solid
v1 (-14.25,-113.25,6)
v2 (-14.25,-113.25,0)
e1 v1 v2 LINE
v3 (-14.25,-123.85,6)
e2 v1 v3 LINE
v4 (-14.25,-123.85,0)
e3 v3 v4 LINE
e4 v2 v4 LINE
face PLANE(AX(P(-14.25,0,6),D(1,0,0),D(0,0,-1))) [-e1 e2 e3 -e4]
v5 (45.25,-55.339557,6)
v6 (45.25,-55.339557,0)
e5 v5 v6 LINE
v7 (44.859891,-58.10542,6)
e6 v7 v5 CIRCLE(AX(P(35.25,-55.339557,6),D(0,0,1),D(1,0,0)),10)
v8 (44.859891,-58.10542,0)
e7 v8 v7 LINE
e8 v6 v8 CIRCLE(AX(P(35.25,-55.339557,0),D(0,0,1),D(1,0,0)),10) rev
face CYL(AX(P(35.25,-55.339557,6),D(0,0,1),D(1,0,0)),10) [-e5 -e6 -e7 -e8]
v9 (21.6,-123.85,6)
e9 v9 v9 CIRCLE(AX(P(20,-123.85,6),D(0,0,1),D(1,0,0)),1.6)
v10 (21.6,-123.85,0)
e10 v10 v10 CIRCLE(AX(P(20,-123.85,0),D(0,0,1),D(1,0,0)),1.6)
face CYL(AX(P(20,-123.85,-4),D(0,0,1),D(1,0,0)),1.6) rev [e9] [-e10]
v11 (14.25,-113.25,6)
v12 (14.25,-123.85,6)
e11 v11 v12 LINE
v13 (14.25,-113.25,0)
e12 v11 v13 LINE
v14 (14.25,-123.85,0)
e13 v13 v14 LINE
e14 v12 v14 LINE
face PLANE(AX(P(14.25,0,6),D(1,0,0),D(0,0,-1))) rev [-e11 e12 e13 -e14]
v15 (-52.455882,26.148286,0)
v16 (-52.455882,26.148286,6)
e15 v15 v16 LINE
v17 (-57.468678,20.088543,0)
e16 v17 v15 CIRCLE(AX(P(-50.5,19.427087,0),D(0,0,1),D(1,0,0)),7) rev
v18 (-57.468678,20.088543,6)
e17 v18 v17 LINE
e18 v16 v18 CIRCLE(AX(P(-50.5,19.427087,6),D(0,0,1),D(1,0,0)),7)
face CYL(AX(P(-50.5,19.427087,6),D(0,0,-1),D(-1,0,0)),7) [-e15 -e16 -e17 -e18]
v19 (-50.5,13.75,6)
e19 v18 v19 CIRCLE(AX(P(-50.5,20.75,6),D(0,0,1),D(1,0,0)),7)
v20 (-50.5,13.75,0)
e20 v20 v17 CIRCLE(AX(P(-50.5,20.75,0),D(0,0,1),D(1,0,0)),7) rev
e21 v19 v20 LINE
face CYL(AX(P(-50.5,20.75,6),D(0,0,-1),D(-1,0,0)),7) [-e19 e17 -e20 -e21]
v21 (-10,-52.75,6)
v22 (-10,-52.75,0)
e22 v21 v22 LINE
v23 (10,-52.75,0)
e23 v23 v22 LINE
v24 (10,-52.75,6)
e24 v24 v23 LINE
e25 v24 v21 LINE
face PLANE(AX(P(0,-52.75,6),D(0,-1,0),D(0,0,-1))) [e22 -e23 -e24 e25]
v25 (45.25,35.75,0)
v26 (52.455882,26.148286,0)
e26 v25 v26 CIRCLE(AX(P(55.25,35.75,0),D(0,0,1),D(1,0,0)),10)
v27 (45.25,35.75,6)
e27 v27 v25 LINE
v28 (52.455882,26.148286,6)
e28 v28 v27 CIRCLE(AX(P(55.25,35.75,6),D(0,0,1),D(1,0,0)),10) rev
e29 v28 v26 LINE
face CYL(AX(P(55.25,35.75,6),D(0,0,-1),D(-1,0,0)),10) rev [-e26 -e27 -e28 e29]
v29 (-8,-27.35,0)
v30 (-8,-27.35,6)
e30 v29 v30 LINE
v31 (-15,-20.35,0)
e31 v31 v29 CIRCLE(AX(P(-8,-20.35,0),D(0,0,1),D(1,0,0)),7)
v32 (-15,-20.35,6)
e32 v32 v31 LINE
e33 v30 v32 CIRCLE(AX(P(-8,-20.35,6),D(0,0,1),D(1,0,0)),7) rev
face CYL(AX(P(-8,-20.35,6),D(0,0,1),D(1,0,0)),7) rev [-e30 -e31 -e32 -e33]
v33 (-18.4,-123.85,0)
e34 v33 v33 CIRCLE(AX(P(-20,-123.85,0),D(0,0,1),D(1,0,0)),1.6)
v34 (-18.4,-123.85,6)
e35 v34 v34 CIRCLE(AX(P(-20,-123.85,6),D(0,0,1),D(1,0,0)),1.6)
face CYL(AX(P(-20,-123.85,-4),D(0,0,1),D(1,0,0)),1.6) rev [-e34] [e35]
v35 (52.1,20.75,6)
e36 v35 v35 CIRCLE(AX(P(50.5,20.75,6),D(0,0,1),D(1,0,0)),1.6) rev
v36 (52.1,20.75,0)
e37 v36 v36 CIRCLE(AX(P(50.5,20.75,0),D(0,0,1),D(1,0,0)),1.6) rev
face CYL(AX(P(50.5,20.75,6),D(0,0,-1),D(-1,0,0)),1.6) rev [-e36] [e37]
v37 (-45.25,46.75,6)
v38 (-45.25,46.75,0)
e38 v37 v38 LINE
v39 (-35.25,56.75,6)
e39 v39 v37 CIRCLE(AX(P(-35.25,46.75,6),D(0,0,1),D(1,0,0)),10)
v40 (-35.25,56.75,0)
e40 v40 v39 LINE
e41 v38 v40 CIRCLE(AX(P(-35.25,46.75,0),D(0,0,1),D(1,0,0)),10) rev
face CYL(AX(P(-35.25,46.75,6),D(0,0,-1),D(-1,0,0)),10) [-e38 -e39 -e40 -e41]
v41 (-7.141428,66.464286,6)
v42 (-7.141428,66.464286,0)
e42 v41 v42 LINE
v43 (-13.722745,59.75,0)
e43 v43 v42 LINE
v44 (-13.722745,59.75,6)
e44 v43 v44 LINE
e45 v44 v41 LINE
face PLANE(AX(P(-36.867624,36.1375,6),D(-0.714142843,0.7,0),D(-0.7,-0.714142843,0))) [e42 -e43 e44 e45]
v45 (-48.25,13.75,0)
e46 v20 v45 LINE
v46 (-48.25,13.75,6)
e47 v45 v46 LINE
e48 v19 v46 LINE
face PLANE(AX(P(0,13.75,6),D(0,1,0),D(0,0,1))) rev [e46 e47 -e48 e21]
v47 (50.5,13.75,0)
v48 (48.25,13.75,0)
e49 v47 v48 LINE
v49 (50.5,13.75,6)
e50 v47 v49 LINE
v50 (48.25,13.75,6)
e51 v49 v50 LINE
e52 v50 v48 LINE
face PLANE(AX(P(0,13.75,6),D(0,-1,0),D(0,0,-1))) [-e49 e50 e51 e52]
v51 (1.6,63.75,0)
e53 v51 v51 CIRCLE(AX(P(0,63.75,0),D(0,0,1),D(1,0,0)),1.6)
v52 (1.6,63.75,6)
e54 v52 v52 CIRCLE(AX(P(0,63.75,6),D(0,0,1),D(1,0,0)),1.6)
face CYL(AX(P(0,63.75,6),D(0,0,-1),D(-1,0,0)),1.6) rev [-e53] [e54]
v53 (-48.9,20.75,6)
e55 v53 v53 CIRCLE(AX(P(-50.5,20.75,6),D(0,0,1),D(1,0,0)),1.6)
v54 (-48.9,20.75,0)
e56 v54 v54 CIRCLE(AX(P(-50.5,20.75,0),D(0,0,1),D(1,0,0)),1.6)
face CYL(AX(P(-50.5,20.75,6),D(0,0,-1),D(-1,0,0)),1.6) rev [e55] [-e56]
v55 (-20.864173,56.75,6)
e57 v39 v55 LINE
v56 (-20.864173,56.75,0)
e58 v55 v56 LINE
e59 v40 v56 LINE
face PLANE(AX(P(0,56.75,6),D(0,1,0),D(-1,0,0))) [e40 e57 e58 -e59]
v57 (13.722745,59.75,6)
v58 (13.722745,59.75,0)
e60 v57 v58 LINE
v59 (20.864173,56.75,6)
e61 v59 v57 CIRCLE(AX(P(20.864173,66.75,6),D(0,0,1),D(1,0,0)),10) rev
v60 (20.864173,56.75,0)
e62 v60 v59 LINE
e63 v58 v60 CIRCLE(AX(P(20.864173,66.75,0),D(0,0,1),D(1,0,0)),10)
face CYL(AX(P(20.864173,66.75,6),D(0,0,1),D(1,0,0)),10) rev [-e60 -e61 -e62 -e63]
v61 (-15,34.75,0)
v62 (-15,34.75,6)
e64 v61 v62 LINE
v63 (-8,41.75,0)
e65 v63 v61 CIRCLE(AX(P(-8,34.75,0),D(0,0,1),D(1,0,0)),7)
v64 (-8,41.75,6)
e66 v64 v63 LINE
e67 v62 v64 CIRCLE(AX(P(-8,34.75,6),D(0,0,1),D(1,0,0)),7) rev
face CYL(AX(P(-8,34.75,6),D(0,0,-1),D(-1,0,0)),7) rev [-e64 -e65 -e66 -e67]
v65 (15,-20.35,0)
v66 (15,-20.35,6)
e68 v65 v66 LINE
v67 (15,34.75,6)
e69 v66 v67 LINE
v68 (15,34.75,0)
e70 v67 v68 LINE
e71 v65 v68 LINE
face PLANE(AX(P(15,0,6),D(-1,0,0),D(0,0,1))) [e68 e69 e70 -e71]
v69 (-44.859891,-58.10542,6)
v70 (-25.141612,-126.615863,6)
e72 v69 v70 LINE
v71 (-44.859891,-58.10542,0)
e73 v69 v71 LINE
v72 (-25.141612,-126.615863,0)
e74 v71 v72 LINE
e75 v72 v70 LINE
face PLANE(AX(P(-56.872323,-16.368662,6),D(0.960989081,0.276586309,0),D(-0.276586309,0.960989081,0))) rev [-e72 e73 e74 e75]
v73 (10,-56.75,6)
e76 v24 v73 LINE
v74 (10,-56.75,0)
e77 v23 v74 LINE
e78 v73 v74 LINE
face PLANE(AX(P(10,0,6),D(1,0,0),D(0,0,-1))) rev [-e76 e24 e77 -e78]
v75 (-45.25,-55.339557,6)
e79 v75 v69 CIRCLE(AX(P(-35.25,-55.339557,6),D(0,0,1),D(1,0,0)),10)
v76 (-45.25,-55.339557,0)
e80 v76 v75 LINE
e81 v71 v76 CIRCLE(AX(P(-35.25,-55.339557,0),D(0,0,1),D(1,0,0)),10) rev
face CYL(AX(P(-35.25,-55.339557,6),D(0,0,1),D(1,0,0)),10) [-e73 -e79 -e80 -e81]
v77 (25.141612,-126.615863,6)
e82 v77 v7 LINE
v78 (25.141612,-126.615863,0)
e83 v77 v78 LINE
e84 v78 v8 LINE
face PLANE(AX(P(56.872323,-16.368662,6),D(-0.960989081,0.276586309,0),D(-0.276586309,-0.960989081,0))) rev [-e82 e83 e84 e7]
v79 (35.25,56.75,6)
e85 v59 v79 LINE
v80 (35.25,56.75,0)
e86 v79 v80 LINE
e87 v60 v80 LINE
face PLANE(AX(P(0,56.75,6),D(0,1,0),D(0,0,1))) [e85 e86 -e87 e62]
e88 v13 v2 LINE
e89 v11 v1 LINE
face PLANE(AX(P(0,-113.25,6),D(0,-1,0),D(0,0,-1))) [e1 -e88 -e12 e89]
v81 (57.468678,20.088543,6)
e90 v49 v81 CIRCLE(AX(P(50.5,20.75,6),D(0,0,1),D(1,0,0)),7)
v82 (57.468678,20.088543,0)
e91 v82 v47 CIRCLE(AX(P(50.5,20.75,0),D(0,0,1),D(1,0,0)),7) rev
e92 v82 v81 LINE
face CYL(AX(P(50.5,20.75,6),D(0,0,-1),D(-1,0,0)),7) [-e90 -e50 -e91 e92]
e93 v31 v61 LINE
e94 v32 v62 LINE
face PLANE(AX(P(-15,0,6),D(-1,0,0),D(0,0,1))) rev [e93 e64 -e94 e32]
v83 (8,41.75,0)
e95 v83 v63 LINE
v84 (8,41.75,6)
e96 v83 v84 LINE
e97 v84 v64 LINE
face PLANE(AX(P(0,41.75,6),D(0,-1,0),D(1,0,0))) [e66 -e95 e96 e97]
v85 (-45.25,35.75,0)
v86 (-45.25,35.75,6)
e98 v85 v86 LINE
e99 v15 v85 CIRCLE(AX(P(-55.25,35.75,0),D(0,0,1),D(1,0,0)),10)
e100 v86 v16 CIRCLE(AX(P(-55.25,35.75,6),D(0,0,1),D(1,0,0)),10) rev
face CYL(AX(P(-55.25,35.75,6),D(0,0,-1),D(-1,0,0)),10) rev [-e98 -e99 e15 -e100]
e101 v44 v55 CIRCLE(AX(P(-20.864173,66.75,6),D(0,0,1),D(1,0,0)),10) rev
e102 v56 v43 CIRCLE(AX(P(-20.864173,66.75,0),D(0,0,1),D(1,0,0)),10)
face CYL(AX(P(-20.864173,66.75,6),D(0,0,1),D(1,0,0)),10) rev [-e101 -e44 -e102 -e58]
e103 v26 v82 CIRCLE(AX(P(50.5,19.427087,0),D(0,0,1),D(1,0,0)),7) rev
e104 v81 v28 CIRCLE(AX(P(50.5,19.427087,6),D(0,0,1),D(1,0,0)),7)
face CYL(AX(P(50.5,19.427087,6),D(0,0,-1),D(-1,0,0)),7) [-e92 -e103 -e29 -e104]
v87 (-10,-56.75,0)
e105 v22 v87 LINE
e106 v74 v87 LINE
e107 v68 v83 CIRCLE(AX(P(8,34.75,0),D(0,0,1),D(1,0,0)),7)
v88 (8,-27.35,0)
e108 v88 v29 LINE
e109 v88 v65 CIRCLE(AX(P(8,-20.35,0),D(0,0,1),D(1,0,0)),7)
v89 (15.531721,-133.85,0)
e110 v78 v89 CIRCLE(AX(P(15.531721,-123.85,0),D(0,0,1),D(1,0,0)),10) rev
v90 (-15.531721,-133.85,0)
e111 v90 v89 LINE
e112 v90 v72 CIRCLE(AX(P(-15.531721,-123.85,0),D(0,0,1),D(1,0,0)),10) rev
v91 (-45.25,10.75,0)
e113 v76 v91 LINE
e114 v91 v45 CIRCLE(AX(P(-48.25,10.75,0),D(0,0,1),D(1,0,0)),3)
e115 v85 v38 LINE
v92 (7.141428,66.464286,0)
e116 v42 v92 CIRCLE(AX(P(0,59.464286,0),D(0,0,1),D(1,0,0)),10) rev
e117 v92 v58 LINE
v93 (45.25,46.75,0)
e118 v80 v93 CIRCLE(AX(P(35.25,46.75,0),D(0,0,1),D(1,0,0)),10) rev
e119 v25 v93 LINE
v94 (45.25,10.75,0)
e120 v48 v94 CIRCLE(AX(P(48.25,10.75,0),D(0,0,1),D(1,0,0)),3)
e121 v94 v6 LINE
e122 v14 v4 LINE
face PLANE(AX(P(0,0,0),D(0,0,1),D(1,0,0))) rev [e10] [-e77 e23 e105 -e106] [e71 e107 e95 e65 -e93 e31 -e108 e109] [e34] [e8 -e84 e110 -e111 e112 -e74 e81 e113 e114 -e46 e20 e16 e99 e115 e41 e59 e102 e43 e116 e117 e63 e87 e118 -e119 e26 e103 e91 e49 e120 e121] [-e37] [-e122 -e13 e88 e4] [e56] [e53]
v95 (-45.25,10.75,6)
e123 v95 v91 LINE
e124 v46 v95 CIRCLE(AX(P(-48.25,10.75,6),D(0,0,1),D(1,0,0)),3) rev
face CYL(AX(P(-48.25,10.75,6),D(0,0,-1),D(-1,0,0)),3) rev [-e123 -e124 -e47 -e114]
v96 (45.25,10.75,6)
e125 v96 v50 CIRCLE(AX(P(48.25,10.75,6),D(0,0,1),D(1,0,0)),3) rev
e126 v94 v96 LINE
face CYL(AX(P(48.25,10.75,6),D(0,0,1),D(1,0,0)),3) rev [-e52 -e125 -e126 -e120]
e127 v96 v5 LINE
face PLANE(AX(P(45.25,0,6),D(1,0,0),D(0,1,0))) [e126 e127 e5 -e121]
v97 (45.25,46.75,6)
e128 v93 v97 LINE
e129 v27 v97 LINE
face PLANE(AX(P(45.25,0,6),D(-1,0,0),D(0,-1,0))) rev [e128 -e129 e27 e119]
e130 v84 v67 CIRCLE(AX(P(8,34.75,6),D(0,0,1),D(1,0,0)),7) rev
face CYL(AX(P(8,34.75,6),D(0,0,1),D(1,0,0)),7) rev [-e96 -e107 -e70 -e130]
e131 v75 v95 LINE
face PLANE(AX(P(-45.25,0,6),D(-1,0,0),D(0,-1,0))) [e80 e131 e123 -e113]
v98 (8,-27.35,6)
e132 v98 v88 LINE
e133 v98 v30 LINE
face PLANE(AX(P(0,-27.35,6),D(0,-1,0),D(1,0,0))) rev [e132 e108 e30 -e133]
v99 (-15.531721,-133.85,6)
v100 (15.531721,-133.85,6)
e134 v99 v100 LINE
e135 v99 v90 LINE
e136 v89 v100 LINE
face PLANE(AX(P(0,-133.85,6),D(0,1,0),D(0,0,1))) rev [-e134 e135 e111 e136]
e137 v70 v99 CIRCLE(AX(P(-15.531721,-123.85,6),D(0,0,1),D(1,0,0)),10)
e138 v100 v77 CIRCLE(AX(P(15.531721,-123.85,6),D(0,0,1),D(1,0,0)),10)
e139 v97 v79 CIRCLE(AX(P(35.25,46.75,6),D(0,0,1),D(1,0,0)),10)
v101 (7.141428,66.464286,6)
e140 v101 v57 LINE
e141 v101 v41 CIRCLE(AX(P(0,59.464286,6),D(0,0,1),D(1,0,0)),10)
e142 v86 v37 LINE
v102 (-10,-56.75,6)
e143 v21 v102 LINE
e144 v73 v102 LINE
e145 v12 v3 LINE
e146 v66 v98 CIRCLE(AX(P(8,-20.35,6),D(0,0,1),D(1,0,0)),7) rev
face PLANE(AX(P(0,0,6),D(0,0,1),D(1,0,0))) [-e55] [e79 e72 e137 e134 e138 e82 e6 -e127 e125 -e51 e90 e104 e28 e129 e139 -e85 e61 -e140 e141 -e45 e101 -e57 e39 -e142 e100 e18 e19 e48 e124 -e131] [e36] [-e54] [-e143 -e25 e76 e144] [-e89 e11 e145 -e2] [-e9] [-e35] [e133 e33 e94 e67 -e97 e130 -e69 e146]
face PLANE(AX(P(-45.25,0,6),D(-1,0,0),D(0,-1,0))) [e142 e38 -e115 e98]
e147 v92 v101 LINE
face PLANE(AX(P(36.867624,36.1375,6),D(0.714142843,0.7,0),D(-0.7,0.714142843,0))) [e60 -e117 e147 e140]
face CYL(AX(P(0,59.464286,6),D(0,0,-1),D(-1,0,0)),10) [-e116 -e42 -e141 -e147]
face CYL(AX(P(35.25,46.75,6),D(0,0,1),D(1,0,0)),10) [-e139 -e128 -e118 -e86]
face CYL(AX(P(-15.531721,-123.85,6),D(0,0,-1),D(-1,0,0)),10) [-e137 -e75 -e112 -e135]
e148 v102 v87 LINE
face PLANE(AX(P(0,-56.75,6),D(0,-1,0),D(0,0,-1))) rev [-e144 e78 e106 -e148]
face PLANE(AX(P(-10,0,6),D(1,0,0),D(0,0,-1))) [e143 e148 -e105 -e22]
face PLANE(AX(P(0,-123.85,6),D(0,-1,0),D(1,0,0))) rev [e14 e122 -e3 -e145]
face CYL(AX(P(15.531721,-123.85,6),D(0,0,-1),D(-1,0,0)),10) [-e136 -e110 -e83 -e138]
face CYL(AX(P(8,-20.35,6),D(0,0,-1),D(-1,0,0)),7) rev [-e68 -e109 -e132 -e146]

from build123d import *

# Parameters (mm, degrees)
ESBO_O1_R                = 1.6
ESBO_O1_W                = 28.5
ESBO_O1_H                = 10.6
ESBO_O1_W_2              = 30
ESBO_O1_H_2              = 69.1
ESBO_O1_W_3              = 20
ESBO_O1_H_3              = 4
RESSALTO_EXTRUS_O1_DEPTH = 6
FILETE3_R                = 3
FILETE4_R                = 10
FILETE5_R                = 7
ESBO_O2_R                = 1.6
CORTE_EXTRUS_O1_DEPTH    = 10


with BuildPart() as part:
    # Esboço1 → Ressalto-extrusão1 (new body)
    with BuildSketch(Plane.XY):
        Polygon((-45.25, -56.75), (-23.05952475, -133.85), (23.05952475, -133.85), (45.25, -56.75), (45.25, 13.75), (57.5, 13.75), (57.5, 25.75), (45.25, 25.75), (45.25, 56.75), (16.663333, 56.75), (0, 73.75), (-16.663333, 56.75), (-45.25, 56.75), (-45.25, 25.75), (-57.5, 25.75), (-57.5, 13.75), (-45.25, 13.75), align=None)
        with Locations((0, 63.75)):
            Circle(ESBO_O1_R, mode=Mode.SUBTRACT)
        with Locations((-50.5, 20.75)):
            Circle(ESBO_O1_R, mode=Mode.SUBTRACT)
        with Locations((50.5, 20.75)):
            Circle(ESBO_O1_R, mode=Mode.SUBTRACT)
        with Locations((0, -118.55)):
            Rectangle(ESBO_O1_W, ESBO_O1_H, mode=Mode.SUBTRACT)
        with Locations((0, 7.2)):
            Rectangle(ESBO_O1_W_2, ESBO_O1_H_2, mode=Mode.SUBTRACT)
        with Locations((0, -54.75)):
            Rectangle(ESBO_O1_W_3, ESBO_O1_H_3, mode=Mode.SUBTRACT)
    extrude(amount=RESSALTO_EXTRUS_O1_DEPTH)

    # Filete3
    filete3_edges = [part.edges().sort_by_distance(p)[0] for p in [
        (-45.25, 13.75, 3),
        (45.25, 13.75, 3),
    ]]
    fillet(filete3_edges, radius=FILETE3_R)

    # Filete4
    filete4_edges = [part.edges().sort_by_distance(p)[0] for p in [
        (-45.25, 25.75, 3),
        (-45.25, 56.75, 3),
        (-16.663333, 56.75, 3),
        (0, 73.75, 3),
        (16.663333, 56.75, 3),
        (45.25, 56.75, 3),
        (45.25, 25.75, 3),
        (45.25, -56.75, 3),
        (23.05952475, -133.85, 3),
        (-23.05952475, -133.85, 3),
        (-45.25, -56.75, 3),
    ]]
    fillet(filete4_edges, radius=FILETE4_R)

    # Filete5
    # the kernel refuses this fillet: 7 mm, written as the material it adds along each edge
    with BuildSketch(Plane(origin=(-15, -27.35, 0), x_dir=(1, 0, 0), z_dir=(0, 0, 1)), Plane(origin=(15, 41.75, 0), x_dir=(-1, 0, 0), z_dir=(0, 0, 1)), Plane(origin=(-15, 41.75, 0), x_dir=(0, -1, 0), z_dir=(0, 0, 1))) as filete5_piece_1:
        with BuildLine():
            CenterArc((FILETE5_R, FILETE5_R), FILETE5_R, 180, 90)
            Line((0, FILETE5_R), (0, 0))
            Line((0, 0), (FILETE5_R, 0))
        make_face()
    extrude(amount=6)
    with BuildSketch(Plane(origin=(15, -27.35, 0), x_dir=(-1, 0, 0), z_dir=(0, 0, 1))) as filete5_piece_2:
        with BuildLine():
            CenterArc((FILETE5_R, -FILETE5_R), FILETE5_R, 90, 90)
            Line((0, -FILETE5_R), (0, 0))
            Line((0, 0), (FILETE5_R, 0))
        make_face()
    extrude(amount=6)
    # the kernel refuses this fillet: 7 mm, written as the material it takes off along each edge
    with BuildSketch(Plane(origin=(57.5, 13.75, -17.5), x_dir=(-1, 0, 0), z_dir=(0, 0, 1))) as filete5_2_piece_1:
        with BuildLine():
            CenterArc((FILETE5_R, -FILETE5_R), FILETE5_R, 90, 90)
            Line((0, -FILETE5_R), (0, 0))
            Line((0, 0), (FILETE5_R, 0))
        make_face()
    extrude(amount=41, mode=Mode.SUBTRACT)
    with BuildSketch(Plane(origin=(57.5, 25.75, -15.807283357), x_dir=(0, -1, 0), z_dir=(0, 0, 1))) as filete5_2_piece_2:
        with BuildLine():
            CenterArc((6.322913343, -7), FILETE5_R, 90, 73.774899865)
            Line((-0.398286269, -5.044117647), (-1.07040623, -4.848529412))
            ThreePointArc((-1.07040623, -4.848529412), (-0.7, -2.25), (-0.7, 0))
            Line((-0.7, 0), (0, 0.7))
            Line((0, 0.7), (6.322913343, 0.7))
            Line((6.322913343, 0.7), (6.322913343, 0))
        make_face()
    extrude(amount=37.614566715, mode=Mode.SUBTRACT)
    with BuildSketch(Plane(origin=(-57.5, 13.75, -17.5), x_dir=(1, 0, 0), z_dir=(0, 0, 1))) as filete5_2_piece_3:
        with BuildLine():
            CenterArc((FILETE5_R, FILETE5_R), FILETE5_R, 180, 90)
            Line((0, FILETE5_R), (0, 0))
            Line((0, 0), (FILETE5_R, 0))
        make_face()
    extrude(amount=41, mode=Mode.SUBTRACT)
    with BuildSketch(Plane(origin=(-57.5, 25.75, -15.807283357), x_dir=(0, -1, 0), z_dir=(0, 0, 1))) as filete5_2_piece_4:
        with BuildLine():
            CenterArc((6.322913343, 7), FILETE5_R, 196.225100135, 73.774899865)
            Line((-0.398286269, 5.044117647), (-1.07040623, 4.848529412))
            ThreePointArc((-1.07040623, 4.848529412), (-0.7, 2.25), (-0.7, 0))
            Line((-0.7, 0), (0, -0.7))
            Line((0, -0.7), (6.322913343, -0.7))
            Line((6.322913343, -0.7), (6.322913343, 0))
        make_face()
    extrude(amount=37.614566715, mode=Mode.SUBTRACT)

    # Esboço2 → Corte-extrusão1 (cut)
    with BuildSketch(Plane.XY.offset(6)):
        with Locations((-20, -123.85)):
            Circle(ESBO_O2_R)
        with Locations((20, -123.85)):
            Circle(ESBO_O2_R)
    extrude(amount=-CORTE_EXTRUS_O1_DEPTH, mode=Mode.SUBTRACT)


solid = part.part
